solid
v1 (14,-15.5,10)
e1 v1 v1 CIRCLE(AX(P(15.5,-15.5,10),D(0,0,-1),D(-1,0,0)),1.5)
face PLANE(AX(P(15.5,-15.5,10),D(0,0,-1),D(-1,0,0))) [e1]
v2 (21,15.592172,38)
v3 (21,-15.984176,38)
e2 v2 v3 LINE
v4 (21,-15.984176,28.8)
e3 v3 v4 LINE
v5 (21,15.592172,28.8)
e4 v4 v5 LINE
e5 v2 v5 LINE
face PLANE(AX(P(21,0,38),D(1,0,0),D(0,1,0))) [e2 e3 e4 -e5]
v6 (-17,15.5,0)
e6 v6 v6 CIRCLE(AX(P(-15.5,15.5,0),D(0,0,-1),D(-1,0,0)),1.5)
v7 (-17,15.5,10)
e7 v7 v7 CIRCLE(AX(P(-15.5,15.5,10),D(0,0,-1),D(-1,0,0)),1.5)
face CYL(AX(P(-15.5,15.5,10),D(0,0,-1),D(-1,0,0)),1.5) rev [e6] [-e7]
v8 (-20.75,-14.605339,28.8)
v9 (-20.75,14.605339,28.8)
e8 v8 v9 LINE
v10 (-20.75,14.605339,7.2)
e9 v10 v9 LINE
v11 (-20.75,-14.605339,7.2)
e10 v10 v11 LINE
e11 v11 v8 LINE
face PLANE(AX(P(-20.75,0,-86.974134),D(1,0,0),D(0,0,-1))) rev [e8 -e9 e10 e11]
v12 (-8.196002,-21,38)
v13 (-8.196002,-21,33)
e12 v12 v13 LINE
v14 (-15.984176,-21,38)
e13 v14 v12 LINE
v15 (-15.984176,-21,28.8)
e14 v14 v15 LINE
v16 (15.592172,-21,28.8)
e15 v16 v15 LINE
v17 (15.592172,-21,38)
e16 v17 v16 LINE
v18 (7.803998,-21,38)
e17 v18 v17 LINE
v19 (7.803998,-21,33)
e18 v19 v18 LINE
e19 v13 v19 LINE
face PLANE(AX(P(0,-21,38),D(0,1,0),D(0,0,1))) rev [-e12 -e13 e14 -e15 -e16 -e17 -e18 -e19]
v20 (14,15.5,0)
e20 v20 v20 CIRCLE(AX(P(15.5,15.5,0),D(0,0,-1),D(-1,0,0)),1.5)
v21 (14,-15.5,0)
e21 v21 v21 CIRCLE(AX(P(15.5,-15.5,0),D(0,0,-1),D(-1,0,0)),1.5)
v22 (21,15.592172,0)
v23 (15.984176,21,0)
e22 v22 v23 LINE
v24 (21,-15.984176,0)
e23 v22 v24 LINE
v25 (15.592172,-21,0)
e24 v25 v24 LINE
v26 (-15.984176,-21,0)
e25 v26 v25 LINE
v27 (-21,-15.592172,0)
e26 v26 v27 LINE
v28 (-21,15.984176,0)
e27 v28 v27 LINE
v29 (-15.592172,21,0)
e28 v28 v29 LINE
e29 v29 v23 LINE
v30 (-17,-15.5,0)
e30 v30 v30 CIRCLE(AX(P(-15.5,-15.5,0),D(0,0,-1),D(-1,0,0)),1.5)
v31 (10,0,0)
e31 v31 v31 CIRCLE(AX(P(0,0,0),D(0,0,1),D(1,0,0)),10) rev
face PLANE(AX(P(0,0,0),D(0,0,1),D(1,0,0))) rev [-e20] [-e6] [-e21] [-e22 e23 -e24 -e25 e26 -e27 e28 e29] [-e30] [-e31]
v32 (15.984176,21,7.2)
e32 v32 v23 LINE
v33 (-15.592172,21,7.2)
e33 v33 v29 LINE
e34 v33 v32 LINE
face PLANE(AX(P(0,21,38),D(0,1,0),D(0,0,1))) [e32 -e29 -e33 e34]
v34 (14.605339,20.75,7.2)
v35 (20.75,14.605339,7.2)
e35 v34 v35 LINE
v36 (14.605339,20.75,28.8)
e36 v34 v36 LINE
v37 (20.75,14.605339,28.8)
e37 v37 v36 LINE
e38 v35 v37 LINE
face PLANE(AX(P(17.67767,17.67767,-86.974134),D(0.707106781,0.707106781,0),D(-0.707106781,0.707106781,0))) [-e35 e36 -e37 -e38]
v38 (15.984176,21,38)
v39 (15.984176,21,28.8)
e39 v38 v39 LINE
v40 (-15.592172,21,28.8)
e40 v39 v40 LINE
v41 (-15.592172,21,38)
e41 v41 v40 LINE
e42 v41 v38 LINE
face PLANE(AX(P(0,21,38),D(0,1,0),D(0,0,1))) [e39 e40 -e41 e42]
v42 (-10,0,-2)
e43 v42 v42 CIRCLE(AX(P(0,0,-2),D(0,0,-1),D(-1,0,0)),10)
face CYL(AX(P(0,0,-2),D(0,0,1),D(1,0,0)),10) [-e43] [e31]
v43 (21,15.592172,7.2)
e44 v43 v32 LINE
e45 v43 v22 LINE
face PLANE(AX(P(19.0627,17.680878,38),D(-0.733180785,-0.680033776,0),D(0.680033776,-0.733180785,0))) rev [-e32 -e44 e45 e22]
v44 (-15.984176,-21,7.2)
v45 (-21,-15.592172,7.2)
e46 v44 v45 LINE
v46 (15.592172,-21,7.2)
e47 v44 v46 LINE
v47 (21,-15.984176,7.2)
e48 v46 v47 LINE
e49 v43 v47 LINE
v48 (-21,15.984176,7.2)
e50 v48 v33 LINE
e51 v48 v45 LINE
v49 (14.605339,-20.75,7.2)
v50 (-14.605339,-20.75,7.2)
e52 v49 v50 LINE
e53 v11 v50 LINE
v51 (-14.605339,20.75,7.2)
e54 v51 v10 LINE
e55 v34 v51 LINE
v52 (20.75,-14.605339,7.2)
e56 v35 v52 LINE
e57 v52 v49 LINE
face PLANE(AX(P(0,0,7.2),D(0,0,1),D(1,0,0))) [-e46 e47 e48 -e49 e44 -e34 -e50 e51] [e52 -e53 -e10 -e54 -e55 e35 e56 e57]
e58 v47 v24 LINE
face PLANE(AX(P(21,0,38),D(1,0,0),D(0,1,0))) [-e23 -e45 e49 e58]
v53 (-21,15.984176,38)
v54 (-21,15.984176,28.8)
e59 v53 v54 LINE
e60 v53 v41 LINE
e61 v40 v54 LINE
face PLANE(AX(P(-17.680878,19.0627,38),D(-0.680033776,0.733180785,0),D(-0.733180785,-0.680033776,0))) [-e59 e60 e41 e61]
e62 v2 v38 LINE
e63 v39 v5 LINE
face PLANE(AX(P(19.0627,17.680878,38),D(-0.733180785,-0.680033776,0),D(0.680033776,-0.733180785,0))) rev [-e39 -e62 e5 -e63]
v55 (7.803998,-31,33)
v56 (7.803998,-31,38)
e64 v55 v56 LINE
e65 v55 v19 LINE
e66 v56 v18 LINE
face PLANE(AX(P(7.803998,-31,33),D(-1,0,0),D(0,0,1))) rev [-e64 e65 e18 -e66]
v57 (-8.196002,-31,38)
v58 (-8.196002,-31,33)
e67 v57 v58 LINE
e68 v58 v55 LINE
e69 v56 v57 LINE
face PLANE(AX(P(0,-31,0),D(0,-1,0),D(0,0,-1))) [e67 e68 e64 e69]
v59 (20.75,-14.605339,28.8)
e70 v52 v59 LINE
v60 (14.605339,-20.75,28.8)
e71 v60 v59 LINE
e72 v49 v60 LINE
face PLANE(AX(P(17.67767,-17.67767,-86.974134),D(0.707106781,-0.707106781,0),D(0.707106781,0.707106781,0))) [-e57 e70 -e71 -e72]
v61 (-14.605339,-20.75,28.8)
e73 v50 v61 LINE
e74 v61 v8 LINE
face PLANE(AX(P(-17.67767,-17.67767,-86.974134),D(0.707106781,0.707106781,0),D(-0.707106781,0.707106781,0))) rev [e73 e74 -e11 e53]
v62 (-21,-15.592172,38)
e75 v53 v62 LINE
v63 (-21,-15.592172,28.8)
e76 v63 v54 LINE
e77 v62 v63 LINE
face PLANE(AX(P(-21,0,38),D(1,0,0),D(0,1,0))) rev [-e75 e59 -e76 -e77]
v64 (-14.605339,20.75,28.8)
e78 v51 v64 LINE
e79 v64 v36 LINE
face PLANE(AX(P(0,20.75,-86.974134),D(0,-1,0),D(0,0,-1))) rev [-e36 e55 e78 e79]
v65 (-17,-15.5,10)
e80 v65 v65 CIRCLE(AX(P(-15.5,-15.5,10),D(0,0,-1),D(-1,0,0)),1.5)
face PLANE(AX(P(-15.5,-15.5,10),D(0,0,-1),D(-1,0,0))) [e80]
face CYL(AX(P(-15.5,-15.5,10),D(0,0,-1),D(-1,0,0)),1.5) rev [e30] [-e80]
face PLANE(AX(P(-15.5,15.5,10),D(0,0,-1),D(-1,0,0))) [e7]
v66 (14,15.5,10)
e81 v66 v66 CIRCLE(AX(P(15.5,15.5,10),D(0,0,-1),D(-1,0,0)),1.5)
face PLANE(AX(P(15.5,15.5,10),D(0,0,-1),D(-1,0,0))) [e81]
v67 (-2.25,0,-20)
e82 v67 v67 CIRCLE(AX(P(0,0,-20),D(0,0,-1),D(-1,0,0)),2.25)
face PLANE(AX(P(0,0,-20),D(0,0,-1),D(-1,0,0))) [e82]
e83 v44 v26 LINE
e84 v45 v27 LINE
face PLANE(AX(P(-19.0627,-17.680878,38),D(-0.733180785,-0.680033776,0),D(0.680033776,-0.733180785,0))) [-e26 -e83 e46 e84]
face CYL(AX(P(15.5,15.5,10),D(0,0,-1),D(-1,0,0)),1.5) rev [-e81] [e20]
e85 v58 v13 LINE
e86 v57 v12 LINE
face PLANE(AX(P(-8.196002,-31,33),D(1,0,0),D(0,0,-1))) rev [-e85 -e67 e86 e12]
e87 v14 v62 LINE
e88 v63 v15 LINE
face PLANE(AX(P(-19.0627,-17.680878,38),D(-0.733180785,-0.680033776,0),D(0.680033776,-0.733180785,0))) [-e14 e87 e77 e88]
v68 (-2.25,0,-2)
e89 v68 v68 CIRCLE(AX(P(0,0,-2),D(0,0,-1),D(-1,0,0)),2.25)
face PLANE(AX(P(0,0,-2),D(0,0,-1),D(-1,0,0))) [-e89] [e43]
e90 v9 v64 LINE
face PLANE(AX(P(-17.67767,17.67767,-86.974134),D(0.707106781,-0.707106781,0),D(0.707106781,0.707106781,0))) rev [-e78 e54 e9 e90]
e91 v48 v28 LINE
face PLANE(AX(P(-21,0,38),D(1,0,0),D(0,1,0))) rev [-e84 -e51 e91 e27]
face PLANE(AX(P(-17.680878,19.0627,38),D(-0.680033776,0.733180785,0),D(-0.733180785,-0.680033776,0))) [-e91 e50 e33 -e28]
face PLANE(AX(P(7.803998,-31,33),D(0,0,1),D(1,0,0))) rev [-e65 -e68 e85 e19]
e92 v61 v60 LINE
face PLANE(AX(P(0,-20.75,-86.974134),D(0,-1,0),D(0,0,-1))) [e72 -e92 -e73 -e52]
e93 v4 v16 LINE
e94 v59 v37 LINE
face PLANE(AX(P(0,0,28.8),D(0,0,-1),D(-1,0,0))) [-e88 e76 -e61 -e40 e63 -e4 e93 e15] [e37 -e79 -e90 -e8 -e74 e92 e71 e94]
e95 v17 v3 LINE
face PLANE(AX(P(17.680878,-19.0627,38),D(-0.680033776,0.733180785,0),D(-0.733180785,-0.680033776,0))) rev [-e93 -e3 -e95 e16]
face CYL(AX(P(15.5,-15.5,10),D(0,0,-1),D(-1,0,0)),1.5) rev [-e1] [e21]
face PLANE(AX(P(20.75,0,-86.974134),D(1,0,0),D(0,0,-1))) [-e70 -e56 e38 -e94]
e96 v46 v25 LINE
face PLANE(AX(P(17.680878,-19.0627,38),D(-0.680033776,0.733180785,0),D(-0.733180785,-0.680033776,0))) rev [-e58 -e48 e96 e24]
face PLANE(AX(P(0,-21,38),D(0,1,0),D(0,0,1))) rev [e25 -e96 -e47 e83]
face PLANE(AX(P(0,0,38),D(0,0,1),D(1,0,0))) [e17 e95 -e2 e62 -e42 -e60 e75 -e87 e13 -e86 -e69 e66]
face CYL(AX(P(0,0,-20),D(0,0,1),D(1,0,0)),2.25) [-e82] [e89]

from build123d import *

# Parameters (mm, degrees)
RESSALTO_EXTRUS_O1_DEPTH   = 38
CORTE_EXTRUS_O_FINA1_START = -30.8
CORTE_EXTRUS_O_FINA1_DEPTH = 21.6
ESBO_O3_R                  = 2.25
RESSALTO_EXTRUS_O2_DEPTH   = 20
ESBO_O4_R                  = 10
RESSALTO_EXTRUS_O3_DEPTH   = 2
ESBO_O5_R                  = 1.5
CORTE_EXTRUS_O1_DEPTH      = 10
ESBO_O7_W                  = 16
ESBO_O7_H                  = 5
RESSALTO_EXTRUS_O4_DEPTH   = 10


# Read off the part's stored shape, not the designer's step: Corte-Extrusão-Fina1
with BuildPart() as part:
    # Esboço1 → Ressalto-extrusão1 (new body)
    with BuildSketch(Plane.XY):
        Polygon((-21, -15.592171873), (-15.984175996, -21), (15.592171873, -21), (21, -15.984175996), (21, 15.592171873), (15.984175996, 21), (-15.592171873, 21), (-21, 15.984175996), align=None)
    extrude(amount=RESSALTO_EXTRUS_O1_DEPTH)

    # Corte-Extrusão-Fina1 outline → Corte-Extrusão-Fina1 (cut)
    with BuildSketch(Plane.XY.offset(38).offset(CORTE_EXTRUS_O_FINA1_START)):
        Polygon((15.592171873, -21), (21, -15.984175996), (21, 15.592171873), (15.984175996, 21), (-15.592171873, 21), (-21, 15.984175996), (-21, -15.592171873), (-15.984175996, -21), align=None)
        Polygon((14.605339059, 20.75), (20.75, 14.605339059), (20.75, -14.605339059), (14.605339059, -20.75), (-14.605339059, -20.75), (-20.75, -14.605339059), (-20.75, 14.605339059), (-14.605339059, 20.75), align=None, mode=Mode.SUBTRACT)
    extrude(amount=CORTE_EXTRUS_O_FINA1_DEPTH, mode=Mode.SUBTRACT)

    # Esboço3 → Ressalto-extrusão2 (add)
    with BuildSketch(Plane(origin=(0, 0, 0), x_dir=(-1, 0, 0), z_dir=(0, 0, -1))):
        with Locations(Location((0, 0, 0), (0, 0, 180))):
            Circle(ESBO_O3_R)
    extrude(amount=RESSALTO_EXTRUS_O2_DEPTH)

    # Esboço4 → Ressalto-extrusão3 (add)
    with BuildSketch(Plane(origin=(0, 0, 0), x_dir=(-1, 0, 0), z_dir=(0, 0, -1))):
        with Locations(Location((0, 0, 0), (0, 0, 180))):
            Circle(ESBO_O4_R)
    extrude(amount=RESSALTO_EXTRUS_O3_DEPTH)

    # Esboço5 → Corte-extrusão1 (cut)
    with BuildSketch(Plane(origin=(0, 0, 0), x_dir=(-1, 0, 0), z_dir=(0, 0, -1))):
        with Locations((15.5, -15.5)):
            Circle(ESBO_O5_R)
        with Locations((-15.5, -15.5)):
            Circle(ESBO_O5_R)
        with Locations((-15.5, 15.5)):
            Circle(ESBO_O5_R)
        with Locations((15.5, 15.5)):
            Circle(ESBO_O5_R)
    extrude(amount=-CORTE_EXTRUS_O1_DEPTH, mode=Mode.SUBTRACT)

    # Esboço7 → Ressalto-extrusão4 (add)
    with BuildSketch(Plane.XZ.offset(21)):
        with Locations((-0.196002062, 35.5)):
            Rectangle(ESBO_O7_W, ESBO_O7_H)
    extrude(amount=RESSALTO_EXTRUS_O4_DEPTH)


solid = part.part
